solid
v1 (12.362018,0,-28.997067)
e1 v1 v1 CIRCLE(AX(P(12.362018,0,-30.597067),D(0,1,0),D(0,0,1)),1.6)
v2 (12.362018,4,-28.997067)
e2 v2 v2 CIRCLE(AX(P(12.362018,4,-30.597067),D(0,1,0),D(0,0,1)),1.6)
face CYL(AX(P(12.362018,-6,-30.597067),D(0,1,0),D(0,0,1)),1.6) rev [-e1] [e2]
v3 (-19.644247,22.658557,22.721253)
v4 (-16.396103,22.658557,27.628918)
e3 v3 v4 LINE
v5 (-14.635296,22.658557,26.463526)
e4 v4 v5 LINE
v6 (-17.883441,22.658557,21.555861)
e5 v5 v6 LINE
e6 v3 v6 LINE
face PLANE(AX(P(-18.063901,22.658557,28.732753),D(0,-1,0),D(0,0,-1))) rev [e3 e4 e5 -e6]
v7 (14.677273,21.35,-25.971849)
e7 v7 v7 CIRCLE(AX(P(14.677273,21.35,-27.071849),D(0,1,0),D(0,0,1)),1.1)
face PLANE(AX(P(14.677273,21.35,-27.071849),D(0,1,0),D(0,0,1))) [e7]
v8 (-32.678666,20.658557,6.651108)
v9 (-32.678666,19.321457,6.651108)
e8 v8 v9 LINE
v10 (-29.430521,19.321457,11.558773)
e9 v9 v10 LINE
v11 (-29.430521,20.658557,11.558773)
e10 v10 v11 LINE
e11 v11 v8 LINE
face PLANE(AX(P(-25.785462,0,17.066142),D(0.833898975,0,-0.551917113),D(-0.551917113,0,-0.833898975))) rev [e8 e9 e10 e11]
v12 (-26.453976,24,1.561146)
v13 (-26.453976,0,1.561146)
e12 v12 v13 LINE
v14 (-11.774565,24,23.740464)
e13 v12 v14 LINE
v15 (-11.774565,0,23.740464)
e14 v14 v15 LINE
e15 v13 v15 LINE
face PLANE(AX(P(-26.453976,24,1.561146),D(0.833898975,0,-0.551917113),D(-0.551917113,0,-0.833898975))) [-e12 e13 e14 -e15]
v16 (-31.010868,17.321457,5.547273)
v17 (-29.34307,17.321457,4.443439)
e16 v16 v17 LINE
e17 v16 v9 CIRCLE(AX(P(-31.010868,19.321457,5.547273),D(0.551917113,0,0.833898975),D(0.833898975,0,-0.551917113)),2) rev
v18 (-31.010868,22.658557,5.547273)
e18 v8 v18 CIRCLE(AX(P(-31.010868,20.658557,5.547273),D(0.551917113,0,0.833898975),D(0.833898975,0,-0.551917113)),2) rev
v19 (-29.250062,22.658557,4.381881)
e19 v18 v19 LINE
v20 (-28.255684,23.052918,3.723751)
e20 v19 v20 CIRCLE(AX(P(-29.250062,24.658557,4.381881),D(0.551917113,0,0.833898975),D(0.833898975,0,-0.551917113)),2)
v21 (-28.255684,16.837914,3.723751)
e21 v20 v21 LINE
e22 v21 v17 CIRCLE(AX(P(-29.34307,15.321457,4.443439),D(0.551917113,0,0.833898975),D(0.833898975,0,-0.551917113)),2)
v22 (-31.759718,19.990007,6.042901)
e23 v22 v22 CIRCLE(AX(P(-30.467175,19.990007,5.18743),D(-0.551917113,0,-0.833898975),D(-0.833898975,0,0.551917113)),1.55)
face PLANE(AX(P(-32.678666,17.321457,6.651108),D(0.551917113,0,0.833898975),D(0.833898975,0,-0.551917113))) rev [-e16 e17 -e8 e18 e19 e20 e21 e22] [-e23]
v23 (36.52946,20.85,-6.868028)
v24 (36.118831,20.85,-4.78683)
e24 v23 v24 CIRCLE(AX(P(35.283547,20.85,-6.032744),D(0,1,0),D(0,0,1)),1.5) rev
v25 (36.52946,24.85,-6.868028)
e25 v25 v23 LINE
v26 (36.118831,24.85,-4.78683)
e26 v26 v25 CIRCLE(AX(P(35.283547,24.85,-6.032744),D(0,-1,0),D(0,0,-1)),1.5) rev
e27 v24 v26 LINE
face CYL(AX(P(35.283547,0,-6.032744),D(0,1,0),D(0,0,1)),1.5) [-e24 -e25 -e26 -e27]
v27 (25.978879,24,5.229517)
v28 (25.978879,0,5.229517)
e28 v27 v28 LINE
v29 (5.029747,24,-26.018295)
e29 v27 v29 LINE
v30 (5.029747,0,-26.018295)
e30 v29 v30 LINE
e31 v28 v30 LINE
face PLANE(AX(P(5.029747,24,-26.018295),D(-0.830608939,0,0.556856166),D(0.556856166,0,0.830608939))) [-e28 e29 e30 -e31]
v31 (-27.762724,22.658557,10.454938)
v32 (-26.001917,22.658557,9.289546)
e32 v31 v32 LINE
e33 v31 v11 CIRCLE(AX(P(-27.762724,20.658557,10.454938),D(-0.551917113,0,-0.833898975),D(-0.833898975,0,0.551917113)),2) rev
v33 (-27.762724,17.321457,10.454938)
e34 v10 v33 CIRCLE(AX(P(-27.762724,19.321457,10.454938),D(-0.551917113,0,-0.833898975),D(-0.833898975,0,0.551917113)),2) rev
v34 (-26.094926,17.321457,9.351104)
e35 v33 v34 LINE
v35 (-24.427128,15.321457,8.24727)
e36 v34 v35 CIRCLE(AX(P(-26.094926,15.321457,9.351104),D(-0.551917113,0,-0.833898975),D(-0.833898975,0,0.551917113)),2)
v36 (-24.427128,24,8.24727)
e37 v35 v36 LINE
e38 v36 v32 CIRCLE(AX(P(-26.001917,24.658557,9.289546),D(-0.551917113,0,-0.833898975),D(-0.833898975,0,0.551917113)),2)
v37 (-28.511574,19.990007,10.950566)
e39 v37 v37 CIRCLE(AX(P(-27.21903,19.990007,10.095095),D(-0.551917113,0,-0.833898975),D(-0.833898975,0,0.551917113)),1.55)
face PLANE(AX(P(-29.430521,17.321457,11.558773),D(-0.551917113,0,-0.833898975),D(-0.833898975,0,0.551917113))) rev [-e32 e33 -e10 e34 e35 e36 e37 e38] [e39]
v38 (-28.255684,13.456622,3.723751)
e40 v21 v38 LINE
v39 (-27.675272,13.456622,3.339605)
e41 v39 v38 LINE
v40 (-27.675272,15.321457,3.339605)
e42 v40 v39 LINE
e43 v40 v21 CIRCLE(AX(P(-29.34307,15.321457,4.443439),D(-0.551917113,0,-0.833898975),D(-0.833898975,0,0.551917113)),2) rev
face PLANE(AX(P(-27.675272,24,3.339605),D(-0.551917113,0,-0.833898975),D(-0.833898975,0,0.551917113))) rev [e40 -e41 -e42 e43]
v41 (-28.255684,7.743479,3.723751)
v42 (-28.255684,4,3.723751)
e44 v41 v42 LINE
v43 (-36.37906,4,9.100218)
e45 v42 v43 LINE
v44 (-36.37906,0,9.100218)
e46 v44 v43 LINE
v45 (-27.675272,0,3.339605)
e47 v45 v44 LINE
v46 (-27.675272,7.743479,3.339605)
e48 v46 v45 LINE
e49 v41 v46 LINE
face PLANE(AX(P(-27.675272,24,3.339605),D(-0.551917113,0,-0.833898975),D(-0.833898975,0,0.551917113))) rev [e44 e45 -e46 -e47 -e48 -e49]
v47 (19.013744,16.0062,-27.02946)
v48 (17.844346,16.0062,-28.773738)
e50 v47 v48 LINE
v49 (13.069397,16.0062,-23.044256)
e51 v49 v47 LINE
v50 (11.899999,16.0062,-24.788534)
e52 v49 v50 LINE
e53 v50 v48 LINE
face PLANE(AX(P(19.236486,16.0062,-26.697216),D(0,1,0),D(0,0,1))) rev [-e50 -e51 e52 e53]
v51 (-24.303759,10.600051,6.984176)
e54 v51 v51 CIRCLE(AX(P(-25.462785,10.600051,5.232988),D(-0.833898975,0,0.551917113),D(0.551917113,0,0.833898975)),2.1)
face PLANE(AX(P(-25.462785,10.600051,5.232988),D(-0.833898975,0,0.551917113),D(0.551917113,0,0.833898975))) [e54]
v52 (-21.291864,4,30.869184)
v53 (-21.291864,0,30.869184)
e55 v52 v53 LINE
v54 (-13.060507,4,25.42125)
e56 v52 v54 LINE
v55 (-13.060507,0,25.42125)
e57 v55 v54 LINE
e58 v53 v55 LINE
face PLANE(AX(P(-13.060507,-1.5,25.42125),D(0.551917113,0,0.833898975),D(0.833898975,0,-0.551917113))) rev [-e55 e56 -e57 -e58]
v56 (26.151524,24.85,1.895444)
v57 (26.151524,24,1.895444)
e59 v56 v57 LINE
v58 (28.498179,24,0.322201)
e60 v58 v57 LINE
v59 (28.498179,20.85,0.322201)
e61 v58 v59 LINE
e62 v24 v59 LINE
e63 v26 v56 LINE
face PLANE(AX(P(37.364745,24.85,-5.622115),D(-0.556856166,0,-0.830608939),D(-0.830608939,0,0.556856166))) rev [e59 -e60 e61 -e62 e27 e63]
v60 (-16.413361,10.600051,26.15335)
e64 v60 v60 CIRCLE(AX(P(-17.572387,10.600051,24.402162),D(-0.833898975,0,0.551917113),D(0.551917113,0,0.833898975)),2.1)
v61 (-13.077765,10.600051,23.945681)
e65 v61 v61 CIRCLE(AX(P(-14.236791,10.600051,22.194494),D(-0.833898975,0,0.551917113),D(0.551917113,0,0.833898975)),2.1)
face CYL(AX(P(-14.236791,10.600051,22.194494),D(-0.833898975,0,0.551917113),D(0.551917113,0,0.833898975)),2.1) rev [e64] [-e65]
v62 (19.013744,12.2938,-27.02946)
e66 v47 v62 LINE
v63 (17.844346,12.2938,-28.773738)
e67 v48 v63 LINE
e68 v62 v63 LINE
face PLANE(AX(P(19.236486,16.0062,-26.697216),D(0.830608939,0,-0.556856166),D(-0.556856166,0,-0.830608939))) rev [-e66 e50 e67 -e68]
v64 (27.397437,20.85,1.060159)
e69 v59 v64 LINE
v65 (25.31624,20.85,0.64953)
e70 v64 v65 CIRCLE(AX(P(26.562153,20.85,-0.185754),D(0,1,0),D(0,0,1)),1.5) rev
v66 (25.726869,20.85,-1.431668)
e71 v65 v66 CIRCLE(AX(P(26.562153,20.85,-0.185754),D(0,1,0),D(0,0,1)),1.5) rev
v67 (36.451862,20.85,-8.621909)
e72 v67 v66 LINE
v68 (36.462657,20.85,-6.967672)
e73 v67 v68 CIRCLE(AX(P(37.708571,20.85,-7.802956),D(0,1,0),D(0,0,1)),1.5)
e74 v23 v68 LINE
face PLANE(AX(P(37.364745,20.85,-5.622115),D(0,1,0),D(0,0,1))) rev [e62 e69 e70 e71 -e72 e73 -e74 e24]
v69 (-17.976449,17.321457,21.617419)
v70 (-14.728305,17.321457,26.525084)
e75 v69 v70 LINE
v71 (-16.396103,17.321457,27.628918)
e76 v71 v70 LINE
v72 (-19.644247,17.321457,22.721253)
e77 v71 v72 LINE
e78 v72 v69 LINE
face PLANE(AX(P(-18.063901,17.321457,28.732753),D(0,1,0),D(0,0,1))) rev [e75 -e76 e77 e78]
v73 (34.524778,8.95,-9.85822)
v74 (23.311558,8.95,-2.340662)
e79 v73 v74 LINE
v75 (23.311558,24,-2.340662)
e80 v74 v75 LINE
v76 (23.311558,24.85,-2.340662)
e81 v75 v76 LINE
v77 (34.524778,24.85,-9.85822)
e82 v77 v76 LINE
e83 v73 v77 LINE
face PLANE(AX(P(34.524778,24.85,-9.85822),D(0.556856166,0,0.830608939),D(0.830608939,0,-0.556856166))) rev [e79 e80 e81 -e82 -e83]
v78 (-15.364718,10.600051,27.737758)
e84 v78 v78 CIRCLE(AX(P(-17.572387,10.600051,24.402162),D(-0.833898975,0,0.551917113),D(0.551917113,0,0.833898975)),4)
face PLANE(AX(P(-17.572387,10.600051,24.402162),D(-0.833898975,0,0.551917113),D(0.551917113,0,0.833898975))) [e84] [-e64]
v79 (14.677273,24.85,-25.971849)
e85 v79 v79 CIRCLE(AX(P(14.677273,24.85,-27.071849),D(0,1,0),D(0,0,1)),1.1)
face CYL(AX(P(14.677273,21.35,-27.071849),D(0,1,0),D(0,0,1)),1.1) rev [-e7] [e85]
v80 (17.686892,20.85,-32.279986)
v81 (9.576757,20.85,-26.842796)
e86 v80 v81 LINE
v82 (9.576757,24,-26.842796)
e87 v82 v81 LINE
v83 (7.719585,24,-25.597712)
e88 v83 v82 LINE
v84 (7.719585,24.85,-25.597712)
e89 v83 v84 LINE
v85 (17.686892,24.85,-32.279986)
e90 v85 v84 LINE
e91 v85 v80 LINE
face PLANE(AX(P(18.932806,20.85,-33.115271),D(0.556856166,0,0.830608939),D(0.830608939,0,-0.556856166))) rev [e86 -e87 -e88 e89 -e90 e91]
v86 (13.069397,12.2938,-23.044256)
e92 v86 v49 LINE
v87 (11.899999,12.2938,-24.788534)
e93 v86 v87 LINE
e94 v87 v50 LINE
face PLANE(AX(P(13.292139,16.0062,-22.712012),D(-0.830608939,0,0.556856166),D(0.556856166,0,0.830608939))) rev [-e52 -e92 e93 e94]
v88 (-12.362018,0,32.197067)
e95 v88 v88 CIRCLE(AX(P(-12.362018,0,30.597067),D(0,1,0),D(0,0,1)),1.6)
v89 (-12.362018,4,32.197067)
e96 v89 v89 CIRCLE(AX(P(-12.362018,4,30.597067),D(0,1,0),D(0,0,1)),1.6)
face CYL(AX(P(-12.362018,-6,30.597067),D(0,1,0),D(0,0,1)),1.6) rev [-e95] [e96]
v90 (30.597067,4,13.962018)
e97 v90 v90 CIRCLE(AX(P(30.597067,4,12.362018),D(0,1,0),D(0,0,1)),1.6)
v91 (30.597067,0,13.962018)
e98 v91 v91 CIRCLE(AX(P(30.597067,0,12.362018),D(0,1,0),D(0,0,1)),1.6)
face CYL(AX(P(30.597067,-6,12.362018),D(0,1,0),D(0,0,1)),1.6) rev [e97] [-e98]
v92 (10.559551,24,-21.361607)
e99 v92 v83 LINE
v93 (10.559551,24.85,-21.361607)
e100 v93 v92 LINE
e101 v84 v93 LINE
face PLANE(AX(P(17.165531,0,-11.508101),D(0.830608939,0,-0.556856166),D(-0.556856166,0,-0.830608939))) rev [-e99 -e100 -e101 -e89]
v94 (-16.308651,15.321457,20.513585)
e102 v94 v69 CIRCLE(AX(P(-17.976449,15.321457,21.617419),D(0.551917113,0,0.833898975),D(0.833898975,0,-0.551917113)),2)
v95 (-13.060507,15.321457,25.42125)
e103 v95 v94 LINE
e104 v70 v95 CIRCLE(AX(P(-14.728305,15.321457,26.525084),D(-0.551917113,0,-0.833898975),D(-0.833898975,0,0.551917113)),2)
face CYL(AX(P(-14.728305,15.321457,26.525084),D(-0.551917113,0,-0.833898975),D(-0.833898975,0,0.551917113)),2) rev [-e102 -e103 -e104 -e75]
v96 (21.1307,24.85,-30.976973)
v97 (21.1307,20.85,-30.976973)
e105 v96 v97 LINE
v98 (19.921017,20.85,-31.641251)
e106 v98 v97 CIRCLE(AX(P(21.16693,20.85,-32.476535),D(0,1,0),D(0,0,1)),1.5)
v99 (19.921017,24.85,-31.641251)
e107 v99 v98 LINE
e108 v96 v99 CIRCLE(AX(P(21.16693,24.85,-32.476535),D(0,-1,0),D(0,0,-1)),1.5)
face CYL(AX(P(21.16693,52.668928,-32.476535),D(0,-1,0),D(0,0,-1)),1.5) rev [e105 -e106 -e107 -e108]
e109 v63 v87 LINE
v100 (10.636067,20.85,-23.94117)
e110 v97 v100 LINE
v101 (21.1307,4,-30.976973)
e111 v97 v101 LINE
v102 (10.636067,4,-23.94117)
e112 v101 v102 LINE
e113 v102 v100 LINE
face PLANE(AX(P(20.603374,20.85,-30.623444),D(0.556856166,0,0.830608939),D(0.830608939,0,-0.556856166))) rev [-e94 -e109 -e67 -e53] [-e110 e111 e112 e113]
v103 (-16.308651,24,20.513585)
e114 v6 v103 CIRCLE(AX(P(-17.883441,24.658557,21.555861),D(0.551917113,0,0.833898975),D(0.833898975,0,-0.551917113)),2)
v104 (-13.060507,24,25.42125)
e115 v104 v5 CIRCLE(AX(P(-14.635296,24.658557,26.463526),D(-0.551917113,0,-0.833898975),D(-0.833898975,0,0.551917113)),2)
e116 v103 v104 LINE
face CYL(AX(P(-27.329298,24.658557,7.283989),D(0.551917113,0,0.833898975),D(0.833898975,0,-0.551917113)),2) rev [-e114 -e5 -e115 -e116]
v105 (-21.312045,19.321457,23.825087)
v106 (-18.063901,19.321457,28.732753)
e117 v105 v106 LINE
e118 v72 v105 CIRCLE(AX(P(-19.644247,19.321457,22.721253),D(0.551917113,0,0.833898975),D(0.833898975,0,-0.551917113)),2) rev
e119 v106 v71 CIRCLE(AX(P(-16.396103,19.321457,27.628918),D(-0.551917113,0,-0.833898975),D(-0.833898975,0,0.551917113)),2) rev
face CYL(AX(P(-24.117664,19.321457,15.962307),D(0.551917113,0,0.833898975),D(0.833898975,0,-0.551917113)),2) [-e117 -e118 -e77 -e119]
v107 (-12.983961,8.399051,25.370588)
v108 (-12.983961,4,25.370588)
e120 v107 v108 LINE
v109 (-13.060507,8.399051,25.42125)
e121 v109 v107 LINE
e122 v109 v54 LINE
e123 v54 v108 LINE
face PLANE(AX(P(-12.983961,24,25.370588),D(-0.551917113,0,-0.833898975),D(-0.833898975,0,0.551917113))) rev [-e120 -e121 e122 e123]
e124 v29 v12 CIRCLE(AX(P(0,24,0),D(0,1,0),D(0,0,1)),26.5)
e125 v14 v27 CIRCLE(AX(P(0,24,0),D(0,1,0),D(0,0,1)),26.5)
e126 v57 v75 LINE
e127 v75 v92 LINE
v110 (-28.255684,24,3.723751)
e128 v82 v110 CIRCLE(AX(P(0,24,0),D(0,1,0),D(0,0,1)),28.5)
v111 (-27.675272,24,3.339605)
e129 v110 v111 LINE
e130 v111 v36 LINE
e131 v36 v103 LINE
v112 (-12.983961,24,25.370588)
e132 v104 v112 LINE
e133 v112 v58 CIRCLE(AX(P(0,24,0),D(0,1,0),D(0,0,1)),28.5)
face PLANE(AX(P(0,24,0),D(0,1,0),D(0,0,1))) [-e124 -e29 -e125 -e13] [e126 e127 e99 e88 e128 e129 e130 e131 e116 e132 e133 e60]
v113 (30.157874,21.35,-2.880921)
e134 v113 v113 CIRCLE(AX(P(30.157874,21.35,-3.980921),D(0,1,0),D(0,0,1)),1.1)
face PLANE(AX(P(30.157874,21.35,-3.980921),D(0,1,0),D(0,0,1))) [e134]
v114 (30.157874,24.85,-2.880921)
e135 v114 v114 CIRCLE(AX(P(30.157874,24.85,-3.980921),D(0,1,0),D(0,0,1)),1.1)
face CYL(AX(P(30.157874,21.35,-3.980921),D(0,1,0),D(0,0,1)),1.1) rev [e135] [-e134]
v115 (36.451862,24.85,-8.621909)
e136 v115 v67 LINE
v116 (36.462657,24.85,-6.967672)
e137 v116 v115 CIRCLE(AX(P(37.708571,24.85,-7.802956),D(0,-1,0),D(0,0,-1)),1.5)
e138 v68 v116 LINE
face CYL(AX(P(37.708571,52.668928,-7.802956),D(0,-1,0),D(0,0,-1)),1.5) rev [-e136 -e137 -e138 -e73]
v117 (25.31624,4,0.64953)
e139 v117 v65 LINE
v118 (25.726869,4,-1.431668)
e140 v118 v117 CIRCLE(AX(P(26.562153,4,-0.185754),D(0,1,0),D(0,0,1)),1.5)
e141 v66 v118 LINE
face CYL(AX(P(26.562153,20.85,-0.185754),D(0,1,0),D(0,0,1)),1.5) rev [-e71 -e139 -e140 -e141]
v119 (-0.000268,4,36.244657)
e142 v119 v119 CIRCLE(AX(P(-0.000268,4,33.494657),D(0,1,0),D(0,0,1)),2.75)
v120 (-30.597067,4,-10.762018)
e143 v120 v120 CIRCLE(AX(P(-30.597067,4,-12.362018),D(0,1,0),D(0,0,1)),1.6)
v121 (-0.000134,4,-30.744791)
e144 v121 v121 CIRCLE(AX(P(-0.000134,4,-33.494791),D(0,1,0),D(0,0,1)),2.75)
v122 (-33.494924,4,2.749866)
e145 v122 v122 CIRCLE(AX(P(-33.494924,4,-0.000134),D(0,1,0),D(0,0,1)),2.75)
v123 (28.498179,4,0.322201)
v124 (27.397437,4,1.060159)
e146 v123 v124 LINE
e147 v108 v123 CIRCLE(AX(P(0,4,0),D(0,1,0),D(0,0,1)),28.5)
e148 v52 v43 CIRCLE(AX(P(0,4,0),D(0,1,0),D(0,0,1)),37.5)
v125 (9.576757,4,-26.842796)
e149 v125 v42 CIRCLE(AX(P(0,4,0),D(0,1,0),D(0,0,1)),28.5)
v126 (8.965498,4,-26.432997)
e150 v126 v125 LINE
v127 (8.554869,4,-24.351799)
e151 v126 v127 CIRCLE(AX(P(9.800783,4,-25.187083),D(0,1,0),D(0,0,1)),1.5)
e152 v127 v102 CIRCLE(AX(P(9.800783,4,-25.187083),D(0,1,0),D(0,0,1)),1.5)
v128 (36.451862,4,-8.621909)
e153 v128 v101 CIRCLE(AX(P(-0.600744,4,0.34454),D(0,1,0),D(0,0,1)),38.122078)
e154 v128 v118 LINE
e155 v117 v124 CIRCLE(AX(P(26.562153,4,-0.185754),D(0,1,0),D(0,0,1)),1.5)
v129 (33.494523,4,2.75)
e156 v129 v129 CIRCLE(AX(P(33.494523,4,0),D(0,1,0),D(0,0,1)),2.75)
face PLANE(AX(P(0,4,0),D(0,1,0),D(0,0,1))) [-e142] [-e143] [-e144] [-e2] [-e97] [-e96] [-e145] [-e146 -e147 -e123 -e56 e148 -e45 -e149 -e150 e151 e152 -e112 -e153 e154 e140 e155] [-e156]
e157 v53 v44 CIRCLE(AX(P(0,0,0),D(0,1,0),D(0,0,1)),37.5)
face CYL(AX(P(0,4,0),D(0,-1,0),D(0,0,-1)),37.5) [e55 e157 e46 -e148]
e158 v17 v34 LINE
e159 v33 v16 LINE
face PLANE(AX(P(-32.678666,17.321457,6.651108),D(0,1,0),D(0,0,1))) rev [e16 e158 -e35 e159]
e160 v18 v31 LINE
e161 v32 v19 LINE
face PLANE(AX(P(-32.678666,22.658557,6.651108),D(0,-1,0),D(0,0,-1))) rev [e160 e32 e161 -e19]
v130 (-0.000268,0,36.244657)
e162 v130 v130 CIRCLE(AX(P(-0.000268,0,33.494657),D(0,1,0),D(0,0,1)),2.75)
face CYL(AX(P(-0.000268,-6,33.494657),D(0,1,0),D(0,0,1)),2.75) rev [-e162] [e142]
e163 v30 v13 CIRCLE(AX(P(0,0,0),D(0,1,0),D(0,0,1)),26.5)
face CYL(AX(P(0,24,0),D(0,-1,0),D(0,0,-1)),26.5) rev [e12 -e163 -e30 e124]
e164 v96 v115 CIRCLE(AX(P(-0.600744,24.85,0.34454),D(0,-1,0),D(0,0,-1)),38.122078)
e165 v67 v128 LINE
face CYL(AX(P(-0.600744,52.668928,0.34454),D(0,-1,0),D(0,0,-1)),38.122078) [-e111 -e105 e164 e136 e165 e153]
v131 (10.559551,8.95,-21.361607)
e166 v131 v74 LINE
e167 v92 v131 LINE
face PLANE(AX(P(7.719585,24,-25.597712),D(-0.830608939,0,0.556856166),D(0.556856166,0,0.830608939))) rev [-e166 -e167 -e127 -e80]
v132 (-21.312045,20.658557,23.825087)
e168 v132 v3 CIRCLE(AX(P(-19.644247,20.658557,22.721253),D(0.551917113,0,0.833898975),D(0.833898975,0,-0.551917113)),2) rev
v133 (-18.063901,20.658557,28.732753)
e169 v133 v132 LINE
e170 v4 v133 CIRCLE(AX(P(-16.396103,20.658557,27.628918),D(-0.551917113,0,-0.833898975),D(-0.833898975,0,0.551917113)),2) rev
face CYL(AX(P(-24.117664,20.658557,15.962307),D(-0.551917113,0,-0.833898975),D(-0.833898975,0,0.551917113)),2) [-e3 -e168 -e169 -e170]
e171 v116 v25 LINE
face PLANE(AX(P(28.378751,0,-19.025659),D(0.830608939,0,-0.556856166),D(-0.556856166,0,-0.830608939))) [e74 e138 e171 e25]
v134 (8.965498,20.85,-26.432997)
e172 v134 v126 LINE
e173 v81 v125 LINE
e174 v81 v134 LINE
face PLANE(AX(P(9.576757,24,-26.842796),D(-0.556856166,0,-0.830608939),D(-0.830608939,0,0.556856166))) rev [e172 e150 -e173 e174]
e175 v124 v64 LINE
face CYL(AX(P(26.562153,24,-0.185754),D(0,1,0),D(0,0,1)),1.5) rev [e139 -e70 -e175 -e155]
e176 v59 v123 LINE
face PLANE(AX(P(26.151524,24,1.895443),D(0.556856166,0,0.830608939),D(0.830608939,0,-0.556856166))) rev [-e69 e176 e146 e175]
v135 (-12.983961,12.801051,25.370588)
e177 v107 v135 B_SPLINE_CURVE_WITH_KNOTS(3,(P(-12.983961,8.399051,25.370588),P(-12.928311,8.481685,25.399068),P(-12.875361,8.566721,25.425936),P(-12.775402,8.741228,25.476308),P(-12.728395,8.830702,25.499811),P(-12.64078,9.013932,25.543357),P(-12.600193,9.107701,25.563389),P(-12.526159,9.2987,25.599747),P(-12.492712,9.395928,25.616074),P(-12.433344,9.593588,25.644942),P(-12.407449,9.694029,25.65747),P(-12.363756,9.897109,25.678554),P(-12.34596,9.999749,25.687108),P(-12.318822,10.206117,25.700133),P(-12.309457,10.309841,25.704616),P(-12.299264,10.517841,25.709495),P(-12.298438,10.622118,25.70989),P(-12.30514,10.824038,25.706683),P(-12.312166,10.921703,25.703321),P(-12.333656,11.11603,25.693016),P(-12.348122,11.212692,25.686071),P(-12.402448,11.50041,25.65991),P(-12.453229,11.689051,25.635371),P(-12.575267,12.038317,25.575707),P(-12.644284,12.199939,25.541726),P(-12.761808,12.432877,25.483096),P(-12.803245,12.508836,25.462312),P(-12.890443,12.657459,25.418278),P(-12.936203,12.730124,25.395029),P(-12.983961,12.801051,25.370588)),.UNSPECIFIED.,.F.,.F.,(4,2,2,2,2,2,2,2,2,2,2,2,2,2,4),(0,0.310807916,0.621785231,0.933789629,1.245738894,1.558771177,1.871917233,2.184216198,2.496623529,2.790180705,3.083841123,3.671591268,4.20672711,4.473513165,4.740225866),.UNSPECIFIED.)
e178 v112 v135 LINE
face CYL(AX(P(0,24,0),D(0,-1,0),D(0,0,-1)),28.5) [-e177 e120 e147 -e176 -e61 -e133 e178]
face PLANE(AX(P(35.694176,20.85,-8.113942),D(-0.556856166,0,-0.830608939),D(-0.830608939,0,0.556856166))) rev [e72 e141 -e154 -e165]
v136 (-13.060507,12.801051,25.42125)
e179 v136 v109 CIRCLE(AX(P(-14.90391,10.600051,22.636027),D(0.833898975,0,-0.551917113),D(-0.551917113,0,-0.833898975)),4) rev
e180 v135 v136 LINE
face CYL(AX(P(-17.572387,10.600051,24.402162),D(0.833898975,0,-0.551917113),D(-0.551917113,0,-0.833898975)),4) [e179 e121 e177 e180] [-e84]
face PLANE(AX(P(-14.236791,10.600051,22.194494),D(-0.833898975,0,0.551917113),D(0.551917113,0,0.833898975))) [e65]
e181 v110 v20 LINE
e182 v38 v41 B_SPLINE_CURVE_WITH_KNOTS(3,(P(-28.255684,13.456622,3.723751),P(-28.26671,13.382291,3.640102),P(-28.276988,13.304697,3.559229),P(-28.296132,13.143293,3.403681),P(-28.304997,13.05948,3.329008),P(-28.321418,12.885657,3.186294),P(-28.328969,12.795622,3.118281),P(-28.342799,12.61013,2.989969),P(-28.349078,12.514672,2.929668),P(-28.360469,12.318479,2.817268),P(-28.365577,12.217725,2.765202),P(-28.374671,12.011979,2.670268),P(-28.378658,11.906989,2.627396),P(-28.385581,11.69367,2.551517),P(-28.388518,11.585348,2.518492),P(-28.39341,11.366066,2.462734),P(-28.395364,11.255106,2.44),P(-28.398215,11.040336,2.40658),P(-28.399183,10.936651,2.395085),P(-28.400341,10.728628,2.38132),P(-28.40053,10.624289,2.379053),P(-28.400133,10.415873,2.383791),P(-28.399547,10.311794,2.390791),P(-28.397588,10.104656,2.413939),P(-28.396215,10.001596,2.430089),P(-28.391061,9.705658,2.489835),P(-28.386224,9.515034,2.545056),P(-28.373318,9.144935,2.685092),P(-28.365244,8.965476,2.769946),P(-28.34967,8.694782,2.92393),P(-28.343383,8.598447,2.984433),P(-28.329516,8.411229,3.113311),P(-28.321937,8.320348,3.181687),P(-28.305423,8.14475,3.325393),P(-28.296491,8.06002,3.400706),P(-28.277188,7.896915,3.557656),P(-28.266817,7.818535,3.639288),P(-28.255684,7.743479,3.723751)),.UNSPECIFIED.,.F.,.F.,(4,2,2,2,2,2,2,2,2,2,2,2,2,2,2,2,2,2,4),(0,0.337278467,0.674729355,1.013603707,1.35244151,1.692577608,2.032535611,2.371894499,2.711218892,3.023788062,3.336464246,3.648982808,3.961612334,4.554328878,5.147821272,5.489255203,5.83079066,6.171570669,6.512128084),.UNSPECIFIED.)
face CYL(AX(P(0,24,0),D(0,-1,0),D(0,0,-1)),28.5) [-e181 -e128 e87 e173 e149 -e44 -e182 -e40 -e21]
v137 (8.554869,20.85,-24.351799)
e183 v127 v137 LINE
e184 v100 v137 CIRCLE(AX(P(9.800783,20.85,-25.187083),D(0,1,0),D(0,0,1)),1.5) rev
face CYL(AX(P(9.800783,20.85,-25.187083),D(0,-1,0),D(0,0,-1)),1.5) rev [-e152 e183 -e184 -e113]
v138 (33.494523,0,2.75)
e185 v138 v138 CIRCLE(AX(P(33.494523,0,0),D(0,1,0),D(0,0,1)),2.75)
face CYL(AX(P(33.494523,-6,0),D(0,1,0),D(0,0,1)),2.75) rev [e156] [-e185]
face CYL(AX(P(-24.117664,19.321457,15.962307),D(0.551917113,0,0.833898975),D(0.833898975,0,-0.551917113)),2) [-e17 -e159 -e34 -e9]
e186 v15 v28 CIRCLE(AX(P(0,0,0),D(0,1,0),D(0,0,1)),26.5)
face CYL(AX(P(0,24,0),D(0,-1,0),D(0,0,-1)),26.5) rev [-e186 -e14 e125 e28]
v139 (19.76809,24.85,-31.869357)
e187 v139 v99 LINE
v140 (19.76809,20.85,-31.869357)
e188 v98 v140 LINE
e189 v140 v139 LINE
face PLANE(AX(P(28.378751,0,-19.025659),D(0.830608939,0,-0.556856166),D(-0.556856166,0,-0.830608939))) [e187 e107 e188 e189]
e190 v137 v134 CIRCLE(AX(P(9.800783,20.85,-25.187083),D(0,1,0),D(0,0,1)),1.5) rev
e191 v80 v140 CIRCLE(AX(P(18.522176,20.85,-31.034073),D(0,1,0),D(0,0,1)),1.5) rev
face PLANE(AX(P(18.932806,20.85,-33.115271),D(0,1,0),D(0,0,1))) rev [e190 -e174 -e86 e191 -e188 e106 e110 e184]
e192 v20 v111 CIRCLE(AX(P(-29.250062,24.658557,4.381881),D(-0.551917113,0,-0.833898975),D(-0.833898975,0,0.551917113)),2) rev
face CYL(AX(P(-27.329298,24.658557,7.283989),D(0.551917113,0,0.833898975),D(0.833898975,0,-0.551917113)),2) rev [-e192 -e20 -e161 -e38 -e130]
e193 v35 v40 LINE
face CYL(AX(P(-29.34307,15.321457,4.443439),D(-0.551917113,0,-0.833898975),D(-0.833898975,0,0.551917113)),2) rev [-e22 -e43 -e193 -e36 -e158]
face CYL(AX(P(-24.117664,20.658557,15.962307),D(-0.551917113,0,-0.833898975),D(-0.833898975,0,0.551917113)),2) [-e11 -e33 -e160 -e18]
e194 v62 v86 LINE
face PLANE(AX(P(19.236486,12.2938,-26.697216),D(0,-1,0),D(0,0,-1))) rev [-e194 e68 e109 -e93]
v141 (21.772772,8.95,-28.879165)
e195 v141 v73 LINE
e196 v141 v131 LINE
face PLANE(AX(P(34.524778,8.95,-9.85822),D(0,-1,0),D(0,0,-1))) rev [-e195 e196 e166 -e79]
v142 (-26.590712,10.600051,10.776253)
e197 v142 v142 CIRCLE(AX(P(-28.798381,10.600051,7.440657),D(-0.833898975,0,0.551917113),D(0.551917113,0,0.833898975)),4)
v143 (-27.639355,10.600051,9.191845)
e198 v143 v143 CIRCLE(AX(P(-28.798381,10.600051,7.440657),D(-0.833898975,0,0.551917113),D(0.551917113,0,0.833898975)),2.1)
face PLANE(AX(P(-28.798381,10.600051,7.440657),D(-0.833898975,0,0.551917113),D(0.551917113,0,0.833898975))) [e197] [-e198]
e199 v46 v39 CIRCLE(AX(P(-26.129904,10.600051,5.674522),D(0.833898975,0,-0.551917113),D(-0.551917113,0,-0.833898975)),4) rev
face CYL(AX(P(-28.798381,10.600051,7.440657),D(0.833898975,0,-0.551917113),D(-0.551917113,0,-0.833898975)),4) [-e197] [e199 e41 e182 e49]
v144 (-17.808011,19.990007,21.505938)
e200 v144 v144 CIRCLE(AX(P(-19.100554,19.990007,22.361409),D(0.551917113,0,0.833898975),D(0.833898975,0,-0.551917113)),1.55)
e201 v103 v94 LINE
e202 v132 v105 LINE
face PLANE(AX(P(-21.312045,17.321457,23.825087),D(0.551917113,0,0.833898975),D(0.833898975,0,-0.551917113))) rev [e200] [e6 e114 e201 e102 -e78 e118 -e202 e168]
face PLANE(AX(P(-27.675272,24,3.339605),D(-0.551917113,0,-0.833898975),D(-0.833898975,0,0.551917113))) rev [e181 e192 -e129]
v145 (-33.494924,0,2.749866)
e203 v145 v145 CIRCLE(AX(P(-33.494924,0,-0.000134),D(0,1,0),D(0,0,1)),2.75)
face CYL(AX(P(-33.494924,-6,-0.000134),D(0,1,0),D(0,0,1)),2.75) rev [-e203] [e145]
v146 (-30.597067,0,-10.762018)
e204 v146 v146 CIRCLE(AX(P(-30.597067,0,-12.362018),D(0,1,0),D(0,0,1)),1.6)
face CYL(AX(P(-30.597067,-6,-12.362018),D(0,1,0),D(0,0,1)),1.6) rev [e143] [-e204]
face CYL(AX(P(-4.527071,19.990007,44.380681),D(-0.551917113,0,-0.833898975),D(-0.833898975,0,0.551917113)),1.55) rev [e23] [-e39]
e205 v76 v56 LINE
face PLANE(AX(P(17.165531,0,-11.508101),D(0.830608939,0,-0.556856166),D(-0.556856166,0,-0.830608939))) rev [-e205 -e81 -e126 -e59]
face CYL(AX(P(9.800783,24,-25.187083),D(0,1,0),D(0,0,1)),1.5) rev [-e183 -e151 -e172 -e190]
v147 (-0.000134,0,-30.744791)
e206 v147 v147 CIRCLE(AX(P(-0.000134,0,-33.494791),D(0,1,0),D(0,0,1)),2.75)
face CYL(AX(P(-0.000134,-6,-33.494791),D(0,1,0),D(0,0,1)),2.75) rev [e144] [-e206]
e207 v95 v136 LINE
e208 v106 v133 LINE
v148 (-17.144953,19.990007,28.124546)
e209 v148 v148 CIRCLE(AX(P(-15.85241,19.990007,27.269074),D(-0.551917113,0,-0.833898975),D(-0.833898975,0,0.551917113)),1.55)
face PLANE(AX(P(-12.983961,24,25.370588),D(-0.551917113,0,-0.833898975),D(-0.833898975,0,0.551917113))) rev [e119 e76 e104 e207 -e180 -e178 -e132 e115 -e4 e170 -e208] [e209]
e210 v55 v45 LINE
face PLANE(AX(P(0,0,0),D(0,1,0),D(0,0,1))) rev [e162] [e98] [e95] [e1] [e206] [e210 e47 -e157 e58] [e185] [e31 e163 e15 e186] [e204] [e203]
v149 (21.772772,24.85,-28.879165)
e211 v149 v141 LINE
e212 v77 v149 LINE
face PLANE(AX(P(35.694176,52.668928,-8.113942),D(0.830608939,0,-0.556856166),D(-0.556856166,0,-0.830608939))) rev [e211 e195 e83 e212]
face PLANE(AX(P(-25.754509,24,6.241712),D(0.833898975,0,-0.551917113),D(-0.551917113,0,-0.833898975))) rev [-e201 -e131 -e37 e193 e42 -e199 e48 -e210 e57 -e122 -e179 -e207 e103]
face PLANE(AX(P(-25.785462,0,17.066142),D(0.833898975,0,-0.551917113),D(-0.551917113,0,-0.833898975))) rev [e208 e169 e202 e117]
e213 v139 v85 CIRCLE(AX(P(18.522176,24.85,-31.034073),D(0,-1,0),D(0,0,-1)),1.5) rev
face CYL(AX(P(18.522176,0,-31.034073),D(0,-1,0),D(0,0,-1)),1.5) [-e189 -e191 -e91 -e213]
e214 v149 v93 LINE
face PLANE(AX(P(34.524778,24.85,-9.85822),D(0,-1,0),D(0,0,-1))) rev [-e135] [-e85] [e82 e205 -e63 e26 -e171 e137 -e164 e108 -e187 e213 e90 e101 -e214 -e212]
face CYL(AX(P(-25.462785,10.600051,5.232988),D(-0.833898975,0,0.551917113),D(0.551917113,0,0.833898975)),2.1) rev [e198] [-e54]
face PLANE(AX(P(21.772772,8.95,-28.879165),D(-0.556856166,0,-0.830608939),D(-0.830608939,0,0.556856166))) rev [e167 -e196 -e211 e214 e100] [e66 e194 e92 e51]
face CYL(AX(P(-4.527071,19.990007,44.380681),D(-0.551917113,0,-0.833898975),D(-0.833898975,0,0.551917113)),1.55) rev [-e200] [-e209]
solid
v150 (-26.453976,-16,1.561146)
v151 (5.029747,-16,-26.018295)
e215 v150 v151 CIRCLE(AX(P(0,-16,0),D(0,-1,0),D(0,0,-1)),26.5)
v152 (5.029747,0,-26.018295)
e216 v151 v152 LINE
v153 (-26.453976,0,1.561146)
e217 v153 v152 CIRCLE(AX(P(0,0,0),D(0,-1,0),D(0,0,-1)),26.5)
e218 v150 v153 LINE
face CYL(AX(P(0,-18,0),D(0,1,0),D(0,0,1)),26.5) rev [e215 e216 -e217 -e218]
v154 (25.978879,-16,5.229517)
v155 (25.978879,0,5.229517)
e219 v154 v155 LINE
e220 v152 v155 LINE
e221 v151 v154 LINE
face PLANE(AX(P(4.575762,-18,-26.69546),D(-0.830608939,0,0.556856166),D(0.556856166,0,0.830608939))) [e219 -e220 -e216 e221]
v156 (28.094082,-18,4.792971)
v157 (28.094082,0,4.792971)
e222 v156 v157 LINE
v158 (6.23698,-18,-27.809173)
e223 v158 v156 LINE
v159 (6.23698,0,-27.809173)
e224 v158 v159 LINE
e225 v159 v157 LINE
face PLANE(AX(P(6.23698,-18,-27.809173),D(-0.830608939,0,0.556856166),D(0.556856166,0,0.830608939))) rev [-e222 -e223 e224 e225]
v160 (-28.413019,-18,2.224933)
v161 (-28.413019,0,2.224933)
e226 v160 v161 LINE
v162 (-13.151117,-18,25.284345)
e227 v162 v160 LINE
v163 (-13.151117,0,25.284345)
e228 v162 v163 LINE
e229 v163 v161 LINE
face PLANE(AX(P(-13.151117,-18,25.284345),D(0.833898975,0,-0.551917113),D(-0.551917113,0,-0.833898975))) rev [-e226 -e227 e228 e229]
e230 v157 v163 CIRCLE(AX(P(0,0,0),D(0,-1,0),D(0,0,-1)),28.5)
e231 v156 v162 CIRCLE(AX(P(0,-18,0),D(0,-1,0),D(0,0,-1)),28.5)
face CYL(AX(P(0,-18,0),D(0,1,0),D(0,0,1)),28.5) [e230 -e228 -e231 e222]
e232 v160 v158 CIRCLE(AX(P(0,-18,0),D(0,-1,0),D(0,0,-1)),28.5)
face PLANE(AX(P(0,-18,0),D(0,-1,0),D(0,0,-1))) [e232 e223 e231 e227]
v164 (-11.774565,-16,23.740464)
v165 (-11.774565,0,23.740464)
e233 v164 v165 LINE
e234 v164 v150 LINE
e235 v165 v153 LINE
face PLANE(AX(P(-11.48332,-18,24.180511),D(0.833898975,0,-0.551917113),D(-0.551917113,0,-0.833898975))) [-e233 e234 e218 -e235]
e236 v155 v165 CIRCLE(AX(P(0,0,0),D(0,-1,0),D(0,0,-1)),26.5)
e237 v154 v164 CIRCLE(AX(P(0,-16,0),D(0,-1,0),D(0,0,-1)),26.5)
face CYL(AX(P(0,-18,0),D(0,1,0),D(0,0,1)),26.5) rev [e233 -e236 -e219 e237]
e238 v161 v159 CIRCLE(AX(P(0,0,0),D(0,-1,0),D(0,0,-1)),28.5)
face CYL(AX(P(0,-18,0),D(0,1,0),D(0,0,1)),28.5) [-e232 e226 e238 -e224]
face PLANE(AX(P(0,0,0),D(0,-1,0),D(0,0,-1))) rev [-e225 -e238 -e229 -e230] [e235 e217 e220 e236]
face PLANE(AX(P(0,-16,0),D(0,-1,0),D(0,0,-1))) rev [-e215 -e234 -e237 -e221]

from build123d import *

# Parameters (mm, degrees)
SKETCH1_R           = 37.5
BOSS_EXTRUDE1_DEPTH = 4
BOSS_EXTRUDE2_DEPTH = 20
SKETCH5_R           = 2.75
SKETCH5_R_2         = 1.6
CUT_EXTRUDE2_DEPTH  = 10
BOSS_EXTRUDE3_DEPTH = 13.5
BOSS_EXTRUDE4_DEPTH = 20.85
FILLET2_R           = 1.5
FILLET3_R           = 1.5
SKETCH9_R           = 1.099999999
SKETCH9_R_2         = 1.1
CUT_EXTRUDE3_DEPTH  = 3.5
SKETCH10_W          = 7.15661295
SKETCH10_H          = 3.712399304
CUT_EXTRUDE4_DEPTH  = 2.5
CUT_EXTRUDE5_DEPTH  = 5.5
BOSS_EXTRUDE5_START = -0.8
SKETCH12_R          = 4
BOSS_EXTRUDE5_DEPTH = 4
SKETCH13_R          = 2.1
CUT_EXTRUDE6_DEPTH  = 4
CUT_EXTRUDE7_START  = -10
CUT_EXTRUDE7_DEPTH  = 10
BOSS_EXTRUDE6_DEPTH = 18
SHELL1_T            = -2
SKETCH17_W          = 5.885203378
SKETCH17_H          = 5.337100414
BOSS_EXTRUDE7_DEPTH = 6
SKETCH18_R          = 1.55
CUT_EXTRUDE8_DEPTH  = 47
FILLET4_R           = 2


# Some blends are built 0.0001 mm under size
with BuildPart() as part:
    # Sketch1 → Boss-Extrude1 (new body)
    with BuildSketch(Plane(origin=(0, 0, 0), x_dir=(1, 0, 0), z_dir=(0, 1, 0))):
        with Locations(Location((0, 0, 0), (0, 0, 270))):
            Circle(SKETCH1_R)
    extrude(amount=BOSS_EXTRUDE1_DEPTH)

    # Sketch3 → Boss-Extrude2 (add)
    with BuildSketch(Plane(origin=(0, 4, 0), x_dir=(1, 0, 0), z_dir=(0, 1, 0))):
        with BuildLine():
            Line((9.576757292, 26.842796422), (7.719584901, 25.597712426))
            Line((7.719584901, 25.597712426), (26.151524, -1.895443469))
            Line((26.151524, -1.895443469), (28.498178651, -0.322201176))
            ThreePointArc((28.498178651, -0.322201176), (14.731875513, -24.397168768), (-12.983961499, -25.370588164))
            Line((-12.983961499, -25.370588164), (-13.060506914, -25.421249846))
            Line((-13.060506914, -25.421249846), (-15.809741222, -21.267394822))
            Line((-15.809741222, -21.267394822), (-25.75450861, -6.241712264))
            Line((-25.75450861, -6.241712264), (-27.675272058, -3.339604984))
            Line((-27.675272058, -3.339604984), (-28.255683957, -3.723751348))
            ThreePointArc((-28.255683957, -3.723751348), (-17.91100321, 22.168580559), (9.576757292, 26.842796422))
        make_face()
        with BuildLine():
            Line((5.029746617, 26.018294505), (25.978878936, -5.229517112))
            ThreePointArc((25.978878936, -5.229517112), (11.666379673, -23.793814014), (-11.774565453, -23.740463525))
            Line((-11.774565453, -23.740463525), (-26.453975583, -1.561145685))
            ThreePointArc((-26.453975583, -1.561145685), (-17.461551391, 19.933495002), (5.029746617, 26.018294505))
        make_face(mode=Mode.SUBTRACT)
    extrude(amount=BOSS_EXTRUDE2_DEPTH)

    # Sketch5 → Cut-Extrude2 (cut)
    with BuildSketch(Plane(origin=(0, 4, 0), x_dir=(1, 0, 0), z_dir=(0, 1, 0))):
        with Locations(Location((-33.494924463, 0.000134114, 0), (0, 0, 270))):
            Circle(SKETCH5_R)
        with Locations(Location((-0.000133567, 33.494790806, 0), (0, 0, 270))):
            Circle(SKETCH5_R)
        with Locations(Location((33.494523125, -9e-08, 0), (0, 0, 270))):
            Circle(SKETCH5_R)
        with Locations(Location((-0.000267771, -33.494656782, 0), (0, 0, 270))):
            Circle(SKETCH5_R)
        with Locations(Location((-12.362017583, -30.597067201, 0), (0, 0, 270))):
            Circle(SKETCH5_R_2)
        with Locations(Location((-30.597067201, 12.362017583, 0), (0, 0, 270))):
            Circle(SKETCH5_R_2)
        with Locations(Location((12.362017583, 30.597067201, 0), (0, 0, 270))):
            Circle(SKETCH5_R_2)
        with Locations(Location((30.597067201, -12.362017583, 0), (0, 0, 270))):
            Circle(SKETCH5_R_2)
    extrude(amount=-CUT_EXTRUDE2_DEPTH, mode=Mode.SUBTRACT)

    # Sketch7 → Boss-Extrude3 (add)
    with BuildSketch(Plane(origin=(17.165530655, 0, -11.508101029), x_dir=(-0.5568561661328637, 0, -0.8306089394172258), z_dir=(0.8306089394172257, 0, -0.5568561661328636))):
        Polygon((-11.037009674, 24.85), (-11.037009674, 8.95), (11.862990326, 8.95), (11.862990326, 24.85), (16.962990264, 24.85), (16.962990264, 20.85), (13.962990326, 20.85), (13.962990326, 4), (-13.137009674, 4), (-13.137009674, 20.85), (-16.137009736, 20.85), (-16.137009736, 24.85), align=None)
    extrude(amount=BOSS_EXTRUDE3_DEPTH)

    # Sketch8 → Boss-Extrude4 (add)
    with BuildSketch(Plane(origin=(0, 4, 0), x_dir=(1, 0, 0), z_dir=(0, 1, 0))):
        with BuildLine():
            Line((35.694176179, 8.113941599), (20.603374077, 30.623443857))
            Line((20.603374077, 30.623443857), (21.130699667, 30.976973048))
            ThreePointArc((21.130699667, 30.976973048), (30.844897132, 21.206897721), (36.451861866, 8.621908618))
            Line((36.451861866, 8.621908618), (35.694176179, 8.113941599))
        make_face()
    extrude(amount=BOSS_EXTRUDE4_DEPTH)

    # Fillet2
    # the kernel refuses this fillet: 1.5 mm, written as the material it adds along each edge
    with BuildSketch(Plane(origin=(20.603374077, 20.85, -30.623443857), x_dir=(-0.5568561661328623, 0, -0.8306089394172268), z_dir=(0, 1, 0))) as fillet2_piece_1:
        with BuildLine():
            CenterArc((1.225374885, -1.5), FILLET2_R, 90, 54.777313156)
            Line((0, -0.634866258), (0, 0))
            Line((0, 0), (1.225374885, 0))
        make_face()
    extrude(amount=4)
    with BuildSketch(Plane(origin=(35.694176179, 20.85, -8.113941599), x_dir=(0.5568561661328658, 0, 0.8306089394172244), z_dir=(0, 1, 0))) as fillet2_piece_2:
        with BuildLine():
            CenterArc((1.380035189, 1.5), FILLET2_R, 203.070488273, 66.929511727)
            Line((0, 0.912205071), (0, 0))
            Line((0, 0), (1.380035189, 0))
        make_face()
    extrude(amount=4)
    # the kernel refuses this fillet: 1.5 mm, written as the material it takes off along each edge
    with BuildSketch(Plane(origin=(18.932805613, 28.6, -33.115270624), x_dir=(0.5568561661328623, 0, 0.8306089394172267), z_dir=(0, -1, 0))) as fillet2_2_piece_1:
        with BuildLine():
            CenterArc((FILLET2_R, FILLET2_R), FILLET2_R, 180, 90)
            Line((0, FILLET2_R), (0, 0))
            Line((0, 0), (FILLET2_R, 0))
        make_face()
    extrude(amount=11.5, mode=Mode.SUBTRACT)
    with BuildSketch(Plane(origin=(37.364744712, 17.1, -5.62211473), x_dir=(-0.8306089394172258, 0, 0.5568561661328635), z_dir=(0, 1, 0))) as fillet2_2_piece_2:
        with BuildLine():
            CenterArc((FILLET2_R, -FILLET2_R), FILLET2_R, 90, 90)
            Line((0, -FILLET2_R), (0, 0))
            Line((0, 0), (FILLET2_R, 0))
        make_face()
    extrude(amount=11.5, mode=Mode.SUBTRACT)

    # Fillet3
    fillet3_edges = [part.edges().sort_by_distance(p)[0] for p in [
        (26.151524, 12.425, 1.895443469),
        (24.480955497, 12.425, -0.596383356),
        (9.390153395, 12.425, -23.105885614),
        (7.719584901, 12.425, -25.597712426),
    ]]
    fillet(fillet3_edges, radius=FILLET3_R - 0.0001)  # a hair under: the kernel refuses the full size

    # Sketch9 → Cut-Extrude3 (cut)
    with BuildSketch(Plane(origin=(0, 24.85, 0), x_dir=(1, 0, 0), z_dir=(0, 1, 0))):
        with Locations(Location((14.677272741, 27.071849433, 0), (0, 0, 270))):
            Circle(SKETCH9_R)
        with Locations(Location((30.15787416, 3.980920917, 0), (0, 0, 270))):
            Circle(SKETCH9_R_2)
    extrude(amount=-CUT_EXTRUDE3_DEPTH, mode=Mode.SUBTRACT)

    # Sketch10 → Cut-Extrude4 (cut)
    with BuildSketch(Plane(origin=(-7.77537726, 0, -11.597784585), x_dir=(-0.8306089394172258, 0, 0.5568561661328637), z_dir=(-0.5568561661328636, 0, -0.8306089394172257))):
        with Locations((-27.266200231, 14.15)):
            Rectangle(SKETCH10_W, SKETCH10_H)
    extrude(amount=-CUT_EXTRUDE4_DEPTH, mode=Mode.SUBTRACT)

    # Sketch11 → Cut-Extrude5 (cut)
    with BuildSketch(Plane(origin=(0, 4, 0), x_dir=(1, 0, 0), z_dir=(0, 1, 0))):
        Polygon((-27.675272058, -3.339604984), (-41.210444234, -12.297876153), (-26.59567909, -34.379521015), (-13.060506914, -25.421249846), align=None)
    extrude(amount=-CUT_EXTRUDE5_DEPTH, mode=Mode.SUBTRACT)

    # Sketch12 → Boss-Extrude5 (add)
    with BuildSketch(Plane(origin=(-20.782068468, 0, 13.75463883), x_dir=(0.5519171126658301, 0, 0.8338989751442398), z_dir=(-0.8338989751442399, 0, 0.5519171126658301)).offset(BOSS_EXTRUDE5_START)):
        with Locations(Location((-9.689563073, 10.6000508, 0), (0, 0, 134.427004001))):
            Circle(SKETCH12_R)
        with Locations(Location((10.650436927, 10.6000508, 0), (0, 0, 326.615838194))):
            Circle(SKETCH12_R)
    extrude(amount=BOSS_EXTRUDE5_DEPTH)

    # Sketch13 → Cut-Extrude6 (cut)
    with BuildSketch(Plane(origin=(-23.450545189, 0, 15.520773591), x_dir=(0.5519171126658301, 0, 0.8338989751442397), z_dir=(-0.8338989751442397, 0, 0.5519171126658301))):
        with Locations((-9.689563073, 10.6000508)):
            Circle(SKETCH13_R)
        with Locations((10.650436927, 10.6000508)):
            Circle(SKETCH13_R)
    extrude(amount=-CUT_EXTRUDE6_DEPTH, mode=Mode.SUBTRACT)

    # Sketch14 → Cut-Extrude7 (cut)
    with BuildSketch(Plane(origin=(0, 4, 0), x_dir=(1, 0, 0), z_dir=(0, 1, 0)).offset(CUT_EXTRUDE7_START)):
        with BuildLine():
            Line((25.978878936, -5.229517112), (5.029746617, 26.018294505))
            ThreePointArc((5.029746617, 26.018294505), (-17.461551391, 19.933495002), (-26.453975583, -1.561145685))
            Line((-26.453975583, -1.561145685), (-11.774565453, -23.740463525))
            ThreePointArc((-11.774565453, -23.740463525), (11.666379673, -23.793814014), (25.978878936, -5.229517112))
        make_face()
    extrude(amount=CUT_EXTRUDE7_DEPTH, mode=Mode.SUBTRACT)

    # Sketch17 → Boss-Extrude7 (add)
    with BuildSketch(Plane(origin=(-20.782068468, 0, 13.75463883), x_dir=(0.5519171126658285, 0, 0.8338989751442409), z_dir=(-0.8338989751442409, 0, 0.5519171126658285))):
        with Locations((-9.546961384, 19.990007272)):
            Rectangle(SKETCH17_W, SKETCH17_H)
        with Locations((11.047835238, 19.990007272)):
            Rectangle(SKETCH17_W, SKETCH17_H)
    extrude(amount=BOSS_EXTRUDE7_DEPTH)

    # Sketch18 → Cut-Extrude8 (cut)
    with BuildSketch(Plane(origin=(-6.89320359, 0, -10.415033847), x_dir=(-0.8338989751442407, 0, 0.5519171126658288), z_dir=(-0.5519171126658288, 0, -0.8338989751442407))):
        with Locations((28.269577066, 19.990007272)):
            Circle(SKETCH18_R)
    extrude(amount=-CUT_EXTRUDE8_DEPTH, mode=Mode.SUBTRACT)

    # Fillet4
    # the kernel refuses this fillet: 2 mm, written as the material it adds along each edge
    with BuildSketch(Plane(origin=(-27.675272058, 17.321457065, 3.339604984), x_dir=(0, -1, 0), z_dir=(0.5519171126658285, 0, 0.8338989751442409))) as fillet4_piece_1:
        with BuildLine():
            CenterArc((FILLET4_R, -FILLET4_R), FILLET4_R, 90, 90)
            Line((0, -FILLET4_R), (0, 0))
            Line((0, 0), (FILLET4_R, 0))
        make_face()
    extrude(amount=5.885203378)
    with BuildSketch(Plane(origin=(-24.427127602, 22.658557479, 8.247270049), x_dir=(0, 1, 0), z_dir=(-0.5519171126658285, 0, -0.8338989751442409))) as fillet4_piece_2:
        with BuildLine():
            CenterArc((2, -1.888465527), FILLET4_R, 109.225003758, 70.774996242)
            Line((0, -1.888465527), (0, 0))
            Line((0, 0), (1.341442521, 0))
        make_face()
    extrude(amount=5.885203378)
    with BuildSketch(Plane(origin=(-13.060506914, 17.321457065, 25.421249846), x_dir=(0, -1, 0), z_dir=(-0.5519171126658285, 0, -0.8338989751442409))) as fillet4_piece_3:
        with BuildLine():
            CenterArc((FILLET4_R, FILLET4_R), FILLET4_R, 180, 90)
            Line((0, FILLET4_R), (0, 0))
            Line((0, 0), (FILLET4_R, 0))
        make_face()
    extrude(amount=5.885203378)
    with BuildSketch(Plane(origin=(-16.30865137, 22.658557479, 20.51358478), x_dir=(0, 1, 0), z_dir=(0.5519171126658285, 0, 0.8338989751442409))) as fillet4_piece_4:
        with BuildLine():
            CenterArc((2, 1.888465527), FILLET4_R, 180, 70.774996242)
            Line((0, 1.888465527), (0, 0))
            Line((0, 0), (1.341442521, 0))
        make_face()
    extrude(amount=5.885203378)
    # the kernel refuses this fillet: 2 mm, written as the material it takes off along each edge
    with BuildSketch(Plane(origin=(-35.438251472, 17.321457065, 2.481612784), x_dir=(0.8338989751442409, 0, -0.5519171126658284), z_dir=(0.5519171126658285, 0, 0.8338989751442409)), Plane(origin=(-24.071630784, 22.658557479, 19.655592581), x_dir=(0, -1, 0), z_dir=(0.5519171126658285, 0, 0.8338989751442409))) as fillet4_2_piece_1:
        with BuildLine():
            CenterArc((FILLET4_R, FILLET4_R), FILLET4_R, 180, 90)
            Line((0, FILLET4_R), (0, 0))
            Line((0, 0), (FILLET4_R, 0))
        make_face()
    extrude(amount=15.885203378, mode=Mode.SUBTRACT)
    with BuildSketch(Plane(origin=(-26.67093589, 22.658557479, 15.728267601), x_dir=(0, -1, 0), z_dir=(-0.5519171126658285, 0, -0.8338989751442409)), Plane(origin=(-15.304315202, 17.321457065, 32.902247397), x_dir=(0.8338989751442408, 0, -0.5519171126658284), z_dir=(-0.5519171126658285, 0, -0.8338989751442409))) as fillet4_2_piece_2:
        with BuildLine():
            CenterArc((FILLET4_R, -FILLET4_R), FILLET4_R, 90, 90)
            Line((0, -FILLET4_R), (0, 0))
            Line((0, 0), (FILLET4_R, 0))
        make_face()
    extrude(amount=15.885203378, mode=Mode.SUBTRACT)


with BuildPart() as body_2:
    # Sketch15 → Boss-Extrude6 (new body)
    with BuildSketch(Plane.XZ):
        with BuildLine():
            Line((6.236979508, -27.809172707), (28.094081803, 4.792970649))
            ThreePointArc((28.094081803, 4.792970649), (12.680581728, 25.523574339), (-13.151117468, 25.284345144))
            Line((-13.151117468, 25.284345144), (-28.413019468, 2.224932517))
            ThreePointArc((-28.413019468, 2.224932517), (-18.666977694, -21.535875737), (6.236979508, -27.809172707))
        make_face()
    extrude(amount=BOSS_EXTRUDE6_DEPTH)

    # Shell1
    shell1_openings = [body_2.faces().sort_by_distance(p)[0] for p in [
        (-1.194735411, 0, 0.806510977),
    ]]
    offset(amount=SHELL1_T, openings=shell1_openings, kind=Kind.INTERSECTION)


solid = Compound([part.part, body_2.part])
